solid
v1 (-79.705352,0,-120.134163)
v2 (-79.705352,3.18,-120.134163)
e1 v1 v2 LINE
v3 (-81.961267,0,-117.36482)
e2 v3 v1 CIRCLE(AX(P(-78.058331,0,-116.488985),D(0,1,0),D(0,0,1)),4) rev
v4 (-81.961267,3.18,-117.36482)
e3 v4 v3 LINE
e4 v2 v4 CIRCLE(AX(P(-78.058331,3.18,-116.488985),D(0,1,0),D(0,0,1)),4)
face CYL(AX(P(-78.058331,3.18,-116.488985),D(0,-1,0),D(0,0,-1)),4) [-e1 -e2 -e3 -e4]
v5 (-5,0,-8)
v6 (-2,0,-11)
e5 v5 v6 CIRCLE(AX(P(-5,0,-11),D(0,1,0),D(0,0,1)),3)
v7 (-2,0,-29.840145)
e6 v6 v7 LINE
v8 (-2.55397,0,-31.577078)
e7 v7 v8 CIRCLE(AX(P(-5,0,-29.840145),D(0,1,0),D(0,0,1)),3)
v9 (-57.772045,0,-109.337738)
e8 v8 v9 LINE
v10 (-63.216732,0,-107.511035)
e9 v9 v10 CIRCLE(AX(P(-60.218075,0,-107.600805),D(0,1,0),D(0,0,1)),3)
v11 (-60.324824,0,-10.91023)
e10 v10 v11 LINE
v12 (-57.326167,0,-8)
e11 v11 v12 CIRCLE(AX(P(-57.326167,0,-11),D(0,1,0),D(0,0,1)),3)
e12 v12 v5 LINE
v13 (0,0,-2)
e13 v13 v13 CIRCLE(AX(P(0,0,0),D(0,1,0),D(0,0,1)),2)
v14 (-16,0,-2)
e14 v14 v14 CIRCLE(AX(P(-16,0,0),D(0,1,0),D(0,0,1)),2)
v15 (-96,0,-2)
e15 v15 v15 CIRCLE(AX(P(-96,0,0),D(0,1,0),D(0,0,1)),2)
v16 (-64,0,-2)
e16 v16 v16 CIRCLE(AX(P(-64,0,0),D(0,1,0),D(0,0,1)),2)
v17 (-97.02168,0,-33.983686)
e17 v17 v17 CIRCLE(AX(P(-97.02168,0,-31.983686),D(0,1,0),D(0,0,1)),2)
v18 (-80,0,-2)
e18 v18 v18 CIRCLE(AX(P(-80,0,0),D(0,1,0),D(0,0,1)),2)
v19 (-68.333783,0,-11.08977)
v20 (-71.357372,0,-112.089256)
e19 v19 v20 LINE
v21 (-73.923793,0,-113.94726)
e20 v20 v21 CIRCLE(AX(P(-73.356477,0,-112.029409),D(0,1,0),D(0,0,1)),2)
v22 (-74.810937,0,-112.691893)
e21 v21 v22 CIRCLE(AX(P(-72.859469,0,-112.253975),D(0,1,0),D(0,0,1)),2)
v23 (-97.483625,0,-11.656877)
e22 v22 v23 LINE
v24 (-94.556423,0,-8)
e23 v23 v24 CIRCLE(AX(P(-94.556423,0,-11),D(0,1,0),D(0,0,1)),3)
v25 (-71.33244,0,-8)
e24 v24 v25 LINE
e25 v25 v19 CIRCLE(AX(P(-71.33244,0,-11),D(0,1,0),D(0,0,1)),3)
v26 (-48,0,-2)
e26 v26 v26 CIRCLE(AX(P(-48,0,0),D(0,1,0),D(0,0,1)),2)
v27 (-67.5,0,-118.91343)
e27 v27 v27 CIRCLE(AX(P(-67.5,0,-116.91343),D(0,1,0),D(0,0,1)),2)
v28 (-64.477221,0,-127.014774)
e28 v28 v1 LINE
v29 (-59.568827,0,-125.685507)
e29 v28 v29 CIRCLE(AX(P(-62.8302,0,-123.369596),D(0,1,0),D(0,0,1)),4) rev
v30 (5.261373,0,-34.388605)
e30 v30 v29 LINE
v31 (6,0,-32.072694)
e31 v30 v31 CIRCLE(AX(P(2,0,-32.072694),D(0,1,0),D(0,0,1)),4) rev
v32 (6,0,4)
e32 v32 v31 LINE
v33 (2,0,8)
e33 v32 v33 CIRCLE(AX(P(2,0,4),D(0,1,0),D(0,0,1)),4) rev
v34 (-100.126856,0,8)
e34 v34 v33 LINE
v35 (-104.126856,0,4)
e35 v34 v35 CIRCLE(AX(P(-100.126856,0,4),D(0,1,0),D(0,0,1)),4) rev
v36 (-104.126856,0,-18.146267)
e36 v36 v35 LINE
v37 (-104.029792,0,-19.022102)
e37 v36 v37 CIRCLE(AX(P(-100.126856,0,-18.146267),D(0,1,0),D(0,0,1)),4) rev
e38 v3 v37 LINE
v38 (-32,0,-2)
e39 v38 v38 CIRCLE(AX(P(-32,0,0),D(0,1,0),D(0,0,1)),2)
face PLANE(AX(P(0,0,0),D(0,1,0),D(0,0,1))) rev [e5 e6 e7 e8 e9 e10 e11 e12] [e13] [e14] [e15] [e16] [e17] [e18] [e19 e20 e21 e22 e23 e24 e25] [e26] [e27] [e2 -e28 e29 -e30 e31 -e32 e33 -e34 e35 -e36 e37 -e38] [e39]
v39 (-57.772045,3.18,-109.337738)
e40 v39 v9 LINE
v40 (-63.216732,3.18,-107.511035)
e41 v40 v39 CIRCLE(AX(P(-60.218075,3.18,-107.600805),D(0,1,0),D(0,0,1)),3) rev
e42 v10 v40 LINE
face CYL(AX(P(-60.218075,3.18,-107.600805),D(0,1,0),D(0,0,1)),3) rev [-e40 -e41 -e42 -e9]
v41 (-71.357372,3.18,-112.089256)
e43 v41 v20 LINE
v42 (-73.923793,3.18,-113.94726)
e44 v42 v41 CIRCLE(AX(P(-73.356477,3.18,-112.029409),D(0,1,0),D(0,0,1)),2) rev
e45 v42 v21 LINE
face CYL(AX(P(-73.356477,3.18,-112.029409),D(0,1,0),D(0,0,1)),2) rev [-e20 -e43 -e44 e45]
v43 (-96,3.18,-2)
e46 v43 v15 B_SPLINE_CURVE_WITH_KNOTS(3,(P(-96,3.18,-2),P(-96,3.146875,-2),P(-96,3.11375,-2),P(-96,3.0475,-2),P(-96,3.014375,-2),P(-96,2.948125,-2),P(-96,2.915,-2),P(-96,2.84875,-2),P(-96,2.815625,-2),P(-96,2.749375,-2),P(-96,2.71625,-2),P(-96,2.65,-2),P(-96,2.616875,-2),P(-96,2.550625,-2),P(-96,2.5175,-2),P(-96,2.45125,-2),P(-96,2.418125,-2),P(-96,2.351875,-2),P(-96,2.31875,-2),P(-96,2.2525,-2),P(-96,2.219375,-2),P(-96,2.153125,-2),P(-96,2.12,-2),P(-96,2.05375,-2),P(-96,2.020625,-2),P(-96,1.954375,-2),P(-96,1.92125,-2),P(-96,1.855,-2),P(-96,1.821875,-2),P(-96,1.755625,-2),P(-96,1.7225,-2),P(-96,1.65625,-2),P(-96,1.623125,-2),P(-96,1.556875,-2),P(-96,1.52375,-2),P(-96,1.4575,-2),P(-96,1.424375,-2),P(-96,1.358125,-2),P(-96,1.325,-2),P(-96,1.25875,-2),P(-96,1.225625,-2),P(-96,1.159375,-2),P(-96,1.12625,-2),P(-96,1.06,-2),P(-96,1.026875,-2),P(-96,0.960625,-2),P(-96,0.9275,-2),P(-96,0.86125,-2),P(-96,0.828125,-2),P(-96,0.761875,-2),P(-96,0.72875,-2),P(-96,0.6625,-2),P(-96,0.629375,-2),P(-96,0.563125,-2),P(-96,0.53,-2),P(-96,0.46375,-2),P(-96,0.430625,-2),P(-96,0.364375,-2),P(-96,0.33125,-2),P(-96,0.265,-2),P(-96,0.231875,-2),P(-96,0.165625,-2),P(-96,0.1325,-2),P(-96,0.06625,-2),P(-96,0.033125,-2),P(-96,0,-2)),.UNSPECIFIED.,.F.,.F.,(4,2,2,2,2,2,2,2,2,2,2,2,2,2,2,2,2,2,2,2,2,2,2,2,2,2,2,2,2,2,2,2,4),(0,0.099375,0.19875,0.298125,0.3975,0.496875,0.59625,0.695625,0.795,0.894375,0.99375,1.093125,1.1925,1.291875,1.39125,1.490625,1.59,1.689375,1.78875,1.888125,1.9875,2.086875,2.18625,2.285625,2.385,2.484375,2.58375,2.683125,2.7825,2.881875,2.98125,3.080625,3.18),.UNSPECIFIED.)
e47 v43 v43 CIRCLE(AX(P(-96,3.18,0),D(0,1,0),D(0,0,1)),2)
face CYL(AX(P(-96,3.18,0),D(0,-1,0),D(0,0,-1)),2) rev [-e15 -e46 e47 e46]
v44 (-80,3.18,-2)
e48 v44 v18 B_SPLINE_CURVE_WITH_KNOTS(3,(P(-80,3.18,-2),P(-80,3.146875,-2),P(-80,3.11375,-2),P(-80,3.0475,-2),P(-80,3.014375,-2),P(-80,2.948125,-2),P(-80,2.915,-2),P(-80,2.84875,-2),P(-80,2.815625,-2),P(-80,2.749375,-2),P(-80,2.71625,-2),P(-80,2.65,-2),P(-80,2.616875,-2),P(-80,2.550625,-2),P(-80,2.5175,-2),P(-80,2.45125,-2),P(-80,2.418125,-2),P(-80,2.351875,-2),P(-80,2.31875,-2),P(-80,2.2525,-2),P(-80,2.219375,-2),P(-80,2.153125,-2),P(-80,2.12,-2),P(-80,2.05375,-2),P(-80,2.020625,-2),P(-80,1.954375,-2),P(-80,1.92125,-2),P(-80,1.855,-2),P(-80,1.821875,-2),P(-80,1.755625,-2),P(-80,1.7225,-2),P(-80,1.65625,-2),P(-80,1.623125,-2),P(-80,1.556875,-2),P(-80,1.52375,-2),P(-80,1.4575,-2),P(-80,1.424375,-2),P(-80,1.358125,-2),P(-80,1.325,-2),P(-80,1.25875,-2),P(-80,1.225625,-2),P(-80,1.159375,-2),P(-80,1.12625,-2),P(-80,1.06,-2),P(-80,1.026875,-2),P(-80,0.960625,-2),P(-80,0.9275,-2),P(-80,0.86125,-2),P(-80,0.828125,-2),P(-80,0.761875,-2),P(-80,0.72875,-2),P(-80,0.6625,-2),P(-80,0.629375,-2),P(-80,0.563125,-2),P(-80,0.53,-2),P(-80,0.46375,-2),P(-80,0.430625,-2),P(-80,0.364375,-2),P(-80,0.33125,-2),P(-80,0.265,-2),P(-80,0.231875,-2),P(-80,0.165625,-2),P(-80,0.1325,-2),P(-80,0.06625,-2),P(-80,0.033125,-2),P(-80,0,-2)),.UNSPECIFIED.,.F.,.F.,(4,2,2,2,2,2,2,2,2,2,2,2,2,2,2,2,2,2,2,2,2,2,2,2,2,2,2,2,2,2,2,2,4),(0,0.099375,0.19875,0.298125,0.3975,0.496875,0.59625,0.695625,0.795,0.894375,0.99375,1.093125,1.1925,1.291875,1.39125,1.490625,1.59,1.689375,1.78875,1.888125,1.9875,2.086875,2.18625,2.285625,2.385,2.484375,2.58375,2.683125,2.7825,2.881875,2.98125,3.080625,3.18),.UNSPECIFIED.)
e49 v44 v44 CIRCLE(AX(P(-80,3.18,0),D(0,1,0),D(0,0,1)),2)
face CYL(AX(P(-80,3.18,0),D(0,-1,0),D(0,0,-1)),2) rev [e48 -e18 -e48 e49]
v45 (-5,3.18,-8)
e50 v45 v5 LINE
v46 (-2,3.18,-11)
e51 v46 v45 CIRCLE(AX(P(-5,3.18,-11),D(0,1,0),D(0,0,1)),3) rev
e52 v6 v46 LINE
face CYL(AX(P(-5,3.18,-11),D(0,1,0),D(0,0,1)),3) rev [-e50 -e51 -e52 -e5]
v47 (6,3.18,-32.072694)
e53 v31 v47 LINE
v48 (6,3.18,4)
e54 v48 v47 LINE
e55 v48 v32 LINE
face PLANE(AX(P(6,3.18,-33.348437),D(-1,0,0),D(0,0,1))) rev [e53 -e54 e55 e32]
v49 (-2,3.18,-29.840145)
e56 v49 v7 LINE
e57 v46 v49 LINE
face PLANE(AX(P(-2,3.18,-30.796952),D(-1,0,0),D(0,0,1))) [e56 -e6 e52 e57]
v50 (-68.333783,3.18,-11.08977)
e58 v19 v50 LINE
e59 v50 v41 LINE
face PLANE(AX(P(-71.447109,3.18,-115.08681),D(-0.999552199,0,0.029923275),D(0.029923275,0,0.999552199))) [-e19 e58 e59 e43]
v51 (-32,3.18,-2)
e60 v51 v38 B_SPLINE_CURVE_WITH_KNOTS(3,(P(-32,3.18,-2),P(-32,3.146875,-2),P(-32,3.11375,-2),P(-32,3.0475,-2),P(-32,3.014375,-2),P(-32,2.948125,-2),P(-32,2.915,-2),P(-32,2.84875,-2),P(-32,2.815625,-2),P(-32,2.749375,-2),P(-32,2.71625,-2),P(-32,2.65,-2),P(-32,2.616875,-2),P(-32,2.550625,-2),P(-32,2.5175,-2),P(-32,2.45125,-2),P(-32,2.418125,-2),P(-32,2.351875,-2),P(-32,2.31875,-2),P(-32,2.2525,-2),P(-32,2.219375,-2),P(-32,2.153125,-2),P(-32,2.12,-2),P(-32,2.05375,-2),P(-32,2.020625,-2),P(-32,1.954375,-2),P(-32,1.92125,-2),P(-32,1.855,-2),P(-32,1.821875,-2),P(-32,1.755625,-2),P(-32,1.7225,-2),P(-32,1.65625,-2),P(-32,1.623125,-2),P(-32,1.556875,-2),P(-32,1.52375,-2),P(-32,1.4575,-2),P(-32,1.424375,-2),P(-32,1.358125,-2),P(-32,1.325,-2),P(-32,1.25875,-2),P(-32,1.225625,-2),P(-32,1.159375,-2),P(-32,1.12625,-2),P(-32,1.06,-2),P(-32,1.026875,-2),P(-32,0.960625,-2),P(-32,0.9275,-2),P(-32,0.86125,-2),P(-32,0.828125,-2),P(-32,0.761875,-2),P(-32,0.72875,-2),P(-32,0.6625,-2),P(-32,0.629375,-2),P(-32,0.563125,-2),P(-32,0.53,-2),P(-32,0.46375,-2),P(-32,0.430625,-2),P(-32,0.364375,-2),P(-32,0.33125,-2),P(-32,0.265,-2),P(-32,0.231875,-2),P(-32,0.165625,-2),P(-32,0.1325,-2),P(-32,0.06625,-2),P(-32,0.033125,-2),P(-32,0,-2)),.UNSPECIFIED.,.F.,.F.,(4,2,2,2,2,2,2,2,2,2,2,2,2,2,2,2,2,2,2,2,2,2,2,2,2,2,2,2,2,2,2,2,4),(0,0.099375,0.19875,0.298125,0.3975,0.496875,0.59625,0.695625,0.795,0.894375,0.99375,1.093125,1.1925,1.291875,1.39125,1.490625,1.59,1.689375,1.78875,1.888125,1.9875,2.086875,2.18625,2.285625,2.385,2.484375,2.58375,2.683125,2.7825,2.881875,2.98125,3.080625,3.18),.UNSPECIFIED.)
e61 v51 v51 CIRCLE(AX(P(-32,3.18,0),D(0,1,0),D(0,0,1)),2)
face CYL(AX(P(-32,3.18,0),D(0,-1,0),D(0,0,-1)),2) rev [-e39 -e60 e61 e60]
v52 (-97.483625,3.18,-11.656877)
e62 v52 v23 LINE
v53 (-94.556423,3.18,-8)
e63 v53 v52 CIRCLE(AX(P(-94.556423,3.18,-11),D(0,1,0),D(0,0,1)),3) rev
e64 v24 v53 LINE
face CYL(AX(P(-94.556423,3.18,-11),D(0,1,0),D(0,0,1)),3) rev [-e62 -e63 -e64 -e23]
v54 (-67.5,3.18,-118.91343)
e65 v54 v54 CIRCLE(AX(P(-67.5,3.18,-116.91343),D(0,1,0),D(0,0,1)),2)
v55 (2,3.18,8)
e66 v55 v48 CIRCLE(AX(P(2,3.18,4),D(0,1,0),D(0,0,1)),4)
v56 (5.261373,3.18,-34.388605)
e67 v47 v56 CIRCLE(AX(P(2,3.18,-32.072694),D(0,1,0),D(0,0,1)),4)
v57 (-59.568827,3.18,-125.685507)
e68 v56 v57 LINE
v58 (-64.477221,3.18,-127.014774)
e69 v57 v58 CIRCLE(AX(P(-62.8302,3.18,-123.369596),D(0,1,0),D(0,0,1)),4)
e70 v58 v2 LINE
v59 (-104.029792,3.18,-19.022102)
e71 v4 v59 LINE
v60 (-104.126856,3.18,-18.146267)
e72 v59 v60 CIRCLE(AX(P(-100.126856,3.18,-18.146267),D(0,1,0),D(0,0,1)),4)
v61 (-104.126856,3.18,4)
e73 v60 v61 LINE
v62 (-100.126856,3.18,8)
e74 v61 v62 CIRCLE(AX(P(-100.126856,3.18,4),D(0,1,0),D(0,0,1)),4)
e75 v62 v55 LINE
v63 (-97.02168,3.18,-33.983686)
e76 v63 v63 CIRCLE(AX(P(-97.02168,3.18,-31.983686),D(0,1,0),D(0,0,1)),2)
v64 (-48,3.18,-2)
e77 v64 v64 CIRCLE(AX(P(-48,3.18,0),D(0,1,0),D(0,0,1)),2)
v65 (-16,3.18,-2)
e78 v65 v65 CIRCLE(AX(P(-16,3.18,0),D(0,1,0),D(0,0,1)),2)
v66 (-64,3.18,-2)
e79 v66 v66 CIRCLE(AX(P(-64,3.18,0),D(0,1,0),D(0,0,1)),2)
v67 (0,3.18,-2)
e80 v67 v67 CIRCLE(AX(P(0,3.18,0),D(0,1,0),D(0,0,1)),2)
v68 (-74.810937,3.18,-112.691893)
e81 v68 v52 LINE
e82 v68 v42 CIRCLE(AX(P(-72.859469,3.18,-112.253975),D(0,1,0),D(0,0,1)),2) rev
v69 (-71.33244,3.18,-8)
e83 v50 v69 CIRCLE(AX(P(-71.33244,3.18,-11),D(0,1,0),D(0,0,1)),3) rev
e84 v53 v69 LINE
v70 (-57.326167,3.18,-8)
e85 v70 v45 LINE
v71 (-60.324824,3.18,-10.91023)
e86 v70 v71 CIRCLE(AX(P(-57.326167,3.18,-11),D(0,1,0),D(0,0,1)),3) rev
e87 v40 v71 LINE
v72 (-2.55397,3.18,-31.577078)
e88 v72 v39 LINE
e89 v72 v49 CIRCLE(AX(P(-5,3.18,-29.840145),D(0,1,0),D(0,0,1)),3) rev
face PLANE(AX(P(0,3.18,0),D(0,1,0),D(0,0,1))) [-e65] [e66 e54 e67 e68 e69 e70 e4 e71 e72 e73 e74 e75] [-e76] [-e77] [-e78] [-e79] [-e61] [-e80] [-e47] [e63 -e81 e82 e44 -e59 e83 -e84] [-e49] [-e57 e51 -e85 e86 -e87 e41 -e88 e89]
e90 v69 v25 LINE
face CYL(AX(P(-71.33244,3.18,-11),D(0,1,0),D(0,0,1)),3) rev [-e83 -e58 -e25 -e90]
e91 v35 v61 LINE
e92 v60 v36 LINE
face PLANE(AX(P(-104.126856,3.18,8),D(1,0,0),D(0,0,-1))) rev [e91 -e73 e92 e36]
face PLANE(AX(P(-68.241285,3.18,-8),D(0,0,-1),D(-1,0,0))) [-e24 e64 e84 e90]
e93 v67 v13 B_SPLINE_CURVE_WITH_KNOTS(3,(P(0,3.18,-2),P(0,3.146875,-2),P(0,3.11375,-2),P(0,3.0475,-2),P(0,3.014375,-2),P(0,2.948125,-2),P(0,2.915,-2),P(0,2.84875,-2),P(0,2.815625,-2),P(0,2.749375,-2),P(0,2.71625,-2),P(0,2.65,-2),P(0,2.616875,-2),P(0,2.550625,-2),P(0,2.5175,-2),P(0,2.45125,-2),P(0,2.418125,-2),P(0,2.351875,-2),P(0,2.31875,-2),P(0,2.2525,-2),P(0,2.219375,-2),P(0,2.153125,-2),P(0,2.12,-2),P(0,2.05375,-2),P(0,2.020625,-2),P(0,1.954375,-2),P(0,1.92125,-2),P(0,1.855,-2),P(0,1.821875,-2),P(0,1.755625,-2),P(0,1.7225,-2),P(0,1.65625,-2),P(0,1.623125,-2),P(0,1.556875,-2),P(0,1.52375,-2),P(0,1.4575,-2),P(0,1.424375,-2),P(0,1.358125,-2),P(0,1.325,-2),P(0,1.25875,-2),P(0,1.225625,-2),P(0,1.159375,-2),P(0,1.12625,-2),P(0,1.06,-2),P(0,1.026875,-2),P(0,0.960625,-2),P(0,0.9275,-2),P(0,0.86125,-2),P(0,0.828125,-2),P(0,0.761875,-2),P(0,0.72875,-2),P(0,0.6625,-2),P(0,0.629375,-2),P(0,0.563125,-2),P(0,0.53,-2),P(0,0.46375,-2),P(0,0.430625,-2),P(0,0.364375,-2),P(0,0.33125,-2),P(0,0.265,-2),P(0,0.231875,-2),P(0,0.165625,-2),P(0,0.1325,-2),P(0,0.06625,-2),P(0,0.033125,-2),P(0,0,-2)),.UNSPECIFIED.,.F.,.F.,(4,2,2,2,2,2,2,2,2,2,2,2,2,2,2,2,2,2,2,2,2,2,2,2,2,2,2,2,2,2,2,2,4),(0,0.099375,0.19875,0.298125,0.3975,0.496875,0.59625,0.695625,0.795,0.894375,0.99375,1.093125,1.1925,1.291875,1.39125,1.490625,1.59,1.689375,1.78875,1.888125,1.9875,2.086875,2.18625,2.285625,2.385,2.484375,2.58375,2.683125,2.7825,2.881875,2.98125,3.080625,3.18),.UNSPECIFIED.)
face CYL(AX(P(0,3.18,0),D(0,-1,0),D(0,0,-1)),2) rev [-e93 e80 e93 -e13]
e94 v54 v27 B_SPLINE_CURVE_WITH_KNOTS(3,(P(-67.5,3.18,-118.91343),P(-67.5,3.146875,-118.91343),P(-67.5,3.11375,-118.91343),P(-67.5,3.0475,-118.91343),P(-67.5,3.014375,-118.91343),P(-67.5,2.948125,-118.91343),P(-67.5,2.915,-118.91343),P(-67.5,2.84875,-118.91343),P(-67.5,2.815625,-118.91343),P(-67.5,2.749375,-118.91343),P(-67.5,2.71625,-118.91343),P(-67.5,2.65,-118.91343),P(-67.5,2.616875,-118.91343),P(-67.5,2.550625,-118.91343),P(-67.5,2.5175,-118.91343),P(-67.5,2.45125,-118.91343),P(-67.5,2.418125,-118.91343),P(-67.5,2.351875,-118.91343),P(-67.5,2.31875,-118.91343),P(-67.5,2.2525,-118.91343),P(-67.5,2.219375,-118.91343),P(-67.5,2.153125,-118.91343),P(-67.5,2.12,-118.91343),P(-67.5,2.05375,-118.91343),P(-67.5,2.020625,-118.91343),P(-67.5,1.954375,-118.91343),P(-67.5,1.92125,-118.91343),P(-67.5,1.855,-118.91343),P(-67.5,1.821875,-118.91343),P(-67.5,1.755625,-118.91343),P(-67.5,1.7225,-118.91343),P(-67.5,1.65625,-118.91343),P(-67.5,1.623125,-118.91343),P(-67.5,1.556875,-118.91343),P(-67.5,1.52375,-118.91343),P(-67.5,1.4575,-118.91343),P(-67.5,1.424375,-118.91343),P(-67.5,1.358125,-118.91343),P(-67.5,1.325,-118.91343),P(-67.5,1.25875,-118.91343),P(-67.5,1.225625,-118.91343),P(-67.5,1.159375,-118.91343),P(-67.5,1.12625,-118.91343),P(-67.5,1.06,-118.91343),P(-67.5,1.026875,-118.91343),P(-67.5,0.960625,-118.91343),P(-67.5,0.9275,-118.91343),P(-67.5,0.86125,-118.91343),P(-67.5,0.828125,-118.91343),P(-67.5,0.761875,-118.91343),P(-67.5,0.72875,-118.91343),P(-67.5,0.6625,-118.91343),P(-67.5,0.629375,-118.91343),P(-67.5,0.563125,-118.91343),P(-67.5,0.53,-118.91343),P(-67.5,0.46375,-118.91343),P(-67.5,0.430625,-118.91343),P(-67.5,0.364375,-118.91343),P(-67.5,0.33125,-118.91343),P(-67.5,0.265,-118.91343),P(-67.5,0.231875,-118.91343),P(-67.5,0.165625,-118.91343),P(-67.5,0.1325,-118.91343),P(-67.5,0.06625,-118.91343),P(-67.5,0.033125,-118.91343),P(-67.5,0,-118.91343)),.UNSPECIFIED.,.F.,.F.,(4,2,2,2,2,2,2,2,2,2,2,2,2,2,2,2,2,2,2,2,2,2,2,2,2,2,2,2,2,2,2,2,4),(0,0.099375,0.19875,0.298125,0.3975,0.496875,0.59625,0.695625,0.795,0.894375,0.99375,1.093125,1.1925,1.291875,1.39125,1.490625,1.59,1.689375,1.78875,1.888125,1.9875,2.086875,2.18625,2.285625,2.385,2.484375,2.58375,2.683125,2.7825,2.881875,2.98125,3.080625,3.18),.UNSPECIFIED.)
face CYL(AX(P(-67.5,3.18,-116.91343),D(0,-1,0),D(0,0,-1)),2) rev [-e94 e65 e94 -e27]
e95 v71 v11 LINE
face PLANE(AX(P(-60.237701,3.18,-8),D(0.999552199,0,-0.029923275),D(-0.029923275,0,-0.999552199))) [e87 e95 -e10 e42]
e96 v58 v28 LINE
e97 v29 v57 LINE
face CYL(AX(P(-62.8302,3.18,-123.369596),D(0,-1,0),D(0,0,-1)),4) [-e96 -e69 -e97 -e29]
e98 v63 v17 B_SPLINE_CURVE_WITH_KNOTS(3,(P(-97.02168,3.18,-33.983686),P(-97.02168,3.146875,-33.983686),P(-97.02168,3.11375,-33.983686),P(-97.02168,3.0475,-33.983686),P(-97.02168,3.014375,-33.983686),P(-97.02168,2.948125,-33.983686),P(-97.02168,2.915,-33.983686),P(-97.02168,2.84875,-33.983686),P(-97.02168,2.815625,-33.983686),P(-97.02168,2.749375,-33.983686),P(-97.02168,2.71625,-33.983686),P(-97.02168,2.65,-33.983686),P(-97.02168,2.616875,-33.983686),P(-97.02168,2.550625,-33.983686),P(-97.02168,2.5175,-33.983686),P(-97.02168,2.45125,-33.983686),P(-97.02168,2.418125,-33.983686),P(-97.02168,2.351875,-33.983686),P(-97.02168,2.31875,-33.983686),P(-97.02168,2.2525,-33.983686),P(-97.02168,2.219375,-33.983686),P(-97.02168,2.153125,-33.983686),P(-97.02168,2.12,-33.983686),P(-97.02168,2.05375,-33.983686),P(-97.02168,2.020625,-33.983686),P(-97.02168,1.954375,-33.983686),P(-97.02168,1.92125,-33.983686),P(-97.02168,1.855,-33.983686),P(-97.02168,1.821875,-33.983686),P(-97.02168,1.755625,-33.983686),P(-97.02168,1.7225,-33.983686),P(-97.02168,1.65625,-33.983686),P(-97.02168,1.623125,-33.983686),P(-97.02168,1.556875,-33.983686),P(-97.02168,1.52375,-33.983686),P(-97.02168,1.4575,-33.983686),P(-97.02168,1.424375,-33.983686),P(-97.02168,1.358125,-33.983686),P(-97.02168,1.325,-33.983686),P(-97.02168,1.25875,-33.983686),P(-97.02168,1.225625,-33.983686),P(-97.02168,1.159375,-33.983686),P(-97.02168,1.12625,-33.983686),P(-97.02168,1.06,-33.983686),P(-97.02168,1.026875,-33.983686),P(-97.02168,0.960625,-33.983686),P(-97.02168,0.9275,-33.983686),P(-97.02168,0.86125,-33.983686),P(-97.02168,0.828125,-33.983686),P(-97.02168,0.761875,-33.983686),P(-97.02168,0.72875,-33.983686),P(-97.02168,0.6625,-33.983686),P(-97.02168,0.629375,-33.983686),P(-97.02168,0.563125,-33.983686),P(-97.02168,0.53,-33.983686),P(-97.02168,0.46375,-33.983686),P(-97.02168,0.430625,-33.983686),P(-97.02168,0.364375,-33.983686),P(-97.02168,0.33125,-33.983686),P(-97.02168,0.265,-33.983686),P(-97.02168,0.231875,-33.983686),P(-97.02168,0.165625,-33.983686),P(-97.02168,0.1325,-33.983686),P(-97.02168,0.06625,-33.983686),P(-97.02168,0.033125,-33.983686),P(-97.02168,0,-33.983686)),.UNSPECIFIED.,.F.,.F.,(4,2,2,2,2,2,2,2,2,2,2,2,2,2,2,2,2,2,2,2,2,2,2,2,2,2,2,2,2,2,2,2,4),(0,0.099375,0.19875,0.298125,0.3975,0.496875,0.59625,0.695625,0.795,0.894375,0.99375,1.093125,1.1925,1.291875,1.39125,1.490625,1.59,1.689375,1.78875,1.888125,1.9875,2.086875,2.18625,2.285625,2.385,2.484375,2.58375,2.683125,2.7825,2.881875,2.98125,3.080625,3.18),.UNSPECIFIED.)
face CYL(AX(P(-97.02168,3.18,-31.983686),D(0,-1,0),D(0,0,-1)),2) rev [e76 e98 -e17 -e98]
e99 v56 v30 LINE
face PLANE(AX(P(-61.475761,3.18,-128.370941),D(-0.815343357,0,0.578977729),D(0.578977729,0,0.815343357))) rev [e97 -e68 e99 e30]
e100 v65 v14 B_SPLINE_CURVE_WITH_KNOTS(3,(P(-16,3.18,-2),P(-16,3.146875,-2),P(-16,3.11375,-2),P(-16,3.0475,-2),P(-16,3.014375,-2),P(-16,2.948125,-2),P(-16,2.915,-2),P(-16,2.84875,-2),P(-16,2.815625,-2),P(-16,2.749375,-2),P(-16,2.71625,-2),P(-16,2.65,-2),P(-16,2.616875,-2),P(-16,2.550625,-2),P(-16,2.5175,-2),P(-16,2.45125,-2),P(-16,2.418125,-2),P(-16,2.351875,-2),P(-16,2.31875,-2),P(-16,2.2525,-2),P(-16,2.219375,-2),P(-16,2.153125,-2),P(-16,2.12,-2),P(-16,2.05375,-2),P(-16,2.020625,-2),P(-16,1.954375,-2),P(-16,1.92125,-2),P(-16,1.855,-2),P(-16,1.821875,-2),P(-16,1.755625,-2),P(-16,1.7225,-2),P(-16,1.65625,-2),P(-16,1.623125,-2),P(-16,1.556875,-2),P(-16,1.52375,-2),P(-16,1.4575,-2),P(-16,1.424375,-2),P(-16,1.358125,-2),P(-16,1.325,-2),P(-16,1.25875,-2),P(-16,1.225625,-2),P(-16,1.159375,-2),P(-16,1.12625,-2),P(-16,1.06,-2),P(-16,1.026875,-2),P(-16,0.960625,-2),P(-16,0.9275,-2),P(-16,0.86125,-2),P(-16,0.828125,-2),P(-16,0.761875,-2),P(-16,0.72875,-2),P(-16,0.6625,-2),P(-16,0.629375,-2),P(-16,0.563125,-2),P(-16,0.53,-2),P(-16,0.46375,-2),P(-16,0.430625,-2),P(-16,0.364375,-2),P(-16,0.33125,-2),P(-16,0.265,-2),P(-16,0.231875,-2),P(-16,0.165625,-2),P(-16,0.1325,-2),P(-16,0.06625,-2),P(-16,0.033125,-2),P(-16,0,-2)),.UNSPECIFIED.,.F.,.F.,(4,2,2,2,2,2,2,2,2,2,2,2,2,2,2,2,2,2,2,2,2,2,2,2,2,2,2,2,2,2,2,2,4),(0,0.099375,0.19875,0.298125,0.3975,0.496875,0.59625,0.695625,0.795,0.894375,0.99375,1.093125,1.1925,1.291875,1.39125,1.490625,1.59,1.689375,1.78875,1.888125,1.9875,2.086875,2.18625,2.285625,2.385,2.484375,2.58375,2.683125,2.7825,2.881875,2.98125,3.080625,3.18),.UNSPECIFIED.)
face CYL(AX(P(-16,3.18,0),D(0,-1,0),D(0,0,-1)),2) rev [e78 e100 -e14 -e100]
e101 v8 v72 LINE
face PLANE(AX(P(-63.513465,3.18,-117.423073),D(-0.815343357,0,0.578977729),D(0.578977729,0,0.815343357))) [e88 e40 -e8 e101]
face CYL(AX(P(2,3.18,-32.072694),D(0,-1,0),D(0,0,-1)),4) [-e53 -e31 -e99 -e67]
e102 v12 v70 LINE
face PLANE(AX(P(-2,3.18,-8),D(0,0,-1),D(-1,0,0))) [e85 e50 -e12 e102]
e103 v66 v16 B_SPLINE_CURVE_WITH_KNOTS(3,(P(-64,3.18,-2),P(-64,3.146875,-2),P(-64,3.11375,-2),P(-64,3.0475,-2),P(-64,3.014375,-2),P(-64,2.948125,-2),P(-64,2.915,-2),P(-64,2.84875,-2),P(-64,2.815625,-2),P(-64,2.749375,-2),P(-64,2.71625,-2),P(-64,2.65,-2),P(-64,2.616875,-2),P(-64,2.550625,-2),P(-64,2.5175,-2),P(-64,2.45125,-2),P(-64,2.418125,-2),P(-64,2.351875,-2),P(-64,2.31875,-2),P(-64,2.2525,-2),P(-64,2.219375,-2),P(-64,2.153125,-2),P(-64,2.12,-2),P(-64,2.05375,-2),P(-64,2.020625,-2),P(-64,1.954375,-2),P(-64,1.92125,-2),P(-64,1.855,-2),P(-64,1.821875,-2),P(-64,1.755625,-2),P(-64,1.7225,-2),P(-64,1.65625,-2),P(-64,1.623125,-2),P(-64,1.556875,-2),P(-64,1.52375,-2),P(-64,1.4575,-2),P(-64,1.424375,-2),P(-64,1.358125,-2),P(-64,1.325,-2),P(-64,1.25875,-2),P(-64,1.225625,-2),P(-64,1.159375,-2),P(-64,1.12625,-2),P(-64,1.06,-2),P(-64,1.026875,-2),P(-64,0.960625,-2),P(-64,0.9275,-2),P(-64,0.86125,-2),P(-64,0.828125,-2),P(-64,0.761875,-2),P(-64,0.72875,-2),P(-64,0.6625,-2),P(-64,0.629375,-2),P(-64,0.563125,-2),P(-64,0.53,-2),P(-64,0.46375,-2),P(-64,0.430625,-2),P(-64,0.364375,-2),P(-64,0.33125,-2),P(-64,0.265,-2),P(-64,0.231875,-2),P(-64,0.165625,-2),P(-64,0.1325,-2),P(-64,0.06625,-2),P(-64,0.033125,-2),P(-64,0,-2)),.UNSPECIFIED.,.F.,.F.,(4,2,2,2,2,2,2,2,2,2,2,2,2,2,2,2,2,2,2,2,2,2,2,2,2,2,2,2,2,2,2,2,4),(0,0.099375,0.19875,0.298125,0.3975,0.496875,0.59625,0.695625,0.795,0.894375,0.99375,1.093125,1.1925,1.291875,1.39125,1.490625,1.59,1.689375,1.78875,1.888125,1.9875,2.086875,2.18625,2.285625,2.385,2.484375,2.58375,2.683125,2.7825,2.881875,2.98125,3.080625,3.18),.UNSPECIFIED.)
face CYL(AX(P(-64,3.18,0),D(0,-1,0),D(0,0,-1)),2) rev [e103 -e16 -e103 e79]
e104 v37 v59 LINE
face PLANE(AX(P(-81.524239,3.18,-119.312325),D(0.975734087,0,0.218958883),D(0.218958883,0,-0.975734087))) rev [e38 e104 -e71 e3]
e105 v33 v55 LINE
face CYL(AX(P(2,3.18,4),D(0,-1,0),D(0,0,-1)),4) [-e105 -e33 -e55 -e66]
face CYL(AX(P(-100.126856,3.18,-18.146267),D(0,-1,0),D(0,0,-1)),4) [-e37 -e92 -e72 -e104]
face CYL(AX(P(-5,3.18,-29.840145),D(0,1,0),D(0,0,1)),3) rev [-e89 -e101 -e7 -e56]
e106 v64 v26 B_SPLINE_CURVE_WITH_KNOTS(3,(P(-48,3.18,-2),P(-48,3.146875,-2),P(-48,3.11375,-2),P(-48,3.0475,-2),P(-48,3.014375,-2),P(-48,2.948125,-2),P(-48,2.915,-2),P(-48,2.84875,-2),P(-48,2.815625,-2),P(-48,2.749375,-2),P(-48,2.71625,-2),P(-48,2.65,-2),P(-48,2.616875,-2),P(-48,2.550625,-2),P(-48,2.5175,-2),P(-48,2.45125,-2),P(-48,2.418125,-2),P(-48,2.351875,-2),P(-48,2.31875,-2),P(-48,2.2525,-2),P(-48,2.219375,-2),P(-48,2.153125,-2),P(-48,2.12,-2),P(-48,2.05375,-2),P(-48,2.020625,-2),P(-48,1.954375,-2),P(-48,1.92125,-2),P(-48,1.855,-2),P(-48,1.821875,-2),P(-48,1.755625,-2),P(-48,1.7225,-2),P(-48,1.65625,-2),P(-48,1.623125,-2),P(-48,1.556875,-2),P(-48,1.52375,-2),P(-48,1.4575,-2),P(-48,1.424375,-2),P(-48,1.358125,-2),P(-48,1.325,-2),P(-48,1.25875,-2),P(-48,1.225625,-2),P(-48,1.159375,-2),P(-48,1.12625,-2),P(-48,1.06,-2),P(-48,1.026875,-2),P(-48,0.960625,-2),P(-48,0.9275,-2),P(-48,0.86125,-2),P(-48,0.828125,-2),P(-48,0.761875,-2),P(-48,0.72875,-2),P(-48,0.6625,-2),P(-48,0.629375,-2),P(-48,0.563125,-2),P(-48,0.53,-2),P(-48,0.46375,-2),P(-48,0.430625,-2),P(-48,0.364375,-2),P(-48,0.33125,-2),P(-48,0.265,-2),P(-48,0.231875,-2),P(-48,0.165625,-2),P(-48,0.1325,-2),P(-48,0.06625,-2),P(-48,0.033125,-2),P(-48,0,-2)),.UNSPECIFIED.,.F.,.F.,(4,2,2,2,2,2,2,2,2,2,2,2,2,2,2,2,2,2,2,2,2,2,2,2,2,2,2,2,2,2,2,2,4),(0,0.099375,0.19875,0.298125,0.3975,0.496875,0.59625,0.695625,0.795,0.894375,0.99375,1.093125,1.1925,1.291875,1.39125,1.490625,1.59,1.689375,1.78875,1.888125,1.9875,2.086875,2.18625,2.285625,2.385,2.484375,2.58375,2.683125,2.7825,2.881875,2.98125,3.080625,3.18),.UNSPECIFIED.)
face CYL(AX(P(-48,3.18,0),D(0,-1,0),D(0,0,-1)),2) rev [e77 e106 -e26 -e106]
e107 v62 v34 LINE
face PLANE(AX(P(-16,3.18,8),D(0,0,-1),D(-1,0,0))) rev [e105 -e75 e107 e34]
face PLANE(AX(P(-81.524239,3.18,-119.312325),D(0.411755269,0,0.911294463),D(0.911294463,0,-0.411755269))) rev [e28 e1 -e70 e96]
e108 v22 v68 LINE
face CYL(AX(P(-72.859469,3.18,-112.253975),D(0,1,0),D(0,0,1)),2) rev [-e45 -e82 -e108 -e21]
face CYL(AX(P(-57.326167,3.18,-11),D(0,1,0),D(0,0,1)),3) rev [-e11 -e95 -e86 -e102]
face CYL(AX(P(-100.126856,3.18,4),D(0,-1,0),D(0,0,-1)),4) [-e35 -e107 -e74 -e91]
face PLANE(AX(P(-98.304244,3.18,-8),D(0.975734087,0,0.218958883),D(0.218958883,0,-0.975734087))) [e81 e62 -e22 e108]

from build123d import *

# Parameters (mm, degrees)
SKETCH1_R           = 2
BOSS_EXTRUDE1_DEPTH = 3.18
FILLET2_R           = 4
FILLET4_R           = 3
FILLET5_R           = 2


with BuildPart() as part:
    # Sketch1 → Boss-Extrude1 (new body)
    with BuildSketch(Plane(origin=(0, 0, 0), x_dir=(1, 0, 0), z_dir=(0, 1, 0))):
        Polygon((-16, -8), (6, -8), (6, 33.34843691), (-61.475760907, 128.370940703), (-81.524239093, 119.312324779), (-104.126855641, 18.58956294), (-104.126855641, -8), (-86.093666761, -8), align=None)
        with Locations(Location((-16, 0, 0), (0, 0, 90))):
            Circle(SKETCH1_R, mode=Mode.SUBTRACT)
        with Locations(Location((0, 0, 0), (0, 0, 90))):
            Circle(SKETCH1_R, mode=Mode.SUBTRACT)
        with Locations(Location((-67.5, 116.913429511, 0), (0, 0, 90))):
            Circle(SKETCH1_R, mode=Mode.SUBTRACT)
        with Locations(Location((-32, 0, 0), (0, 0, 90))):
            Circle(SKETCH1_R, mode=Mode.SUBTRACT)
        with Locations(Location((-48, 0, 0), (0, 0, 90))):
            Circle(SKETCH1_R, mode=Mode.SUBTRACT)
        with Locations(Location((-64, 0, 0), (0, 0, 90))):
            Circle(SKETCH1_R, mode=Mode.SUBTRACT)
        with Locations(Location((-80, 0, 0), (0, 0, 90))):
            Circle(SKETCH1_R, mode=Mode.SUBTRACT)
        with Locations(Location((-96, 0, 0), (0, 0, 90))):
            Circle(SKETCH1_R, mode=Mode.SUBTRACT)
        with Locations(Location((-97.021679837, 31.983686003, 0), (0, 0, 90))):
            Circle(SKETCH1_R, mode=Mode.SUBTRACT)
        Polygon((-63.513465031, 117.423073167), (-2, 30.796951643), (-2, 8), (-60.237701437, 8), align=None, mode=Mode.SUBTRACT)
        Polygon((-68.241285453, 8), (-98.304243511, 8), (-74.592422981, 113.66564481), (-71.44710907, 115.086809569), align=None, mode=Mode.SUBTRACT)
    extrude(amount=BOSS_EXTRUDE1_DEPTH)

    # Fillet2
    fillet2_edges = [part.edges().sort_by_distance(p)[0] for p in [
        (6, 1.59, 8),
        (-104.126855641, 1.59, 8),
        (-104.126855641, 1.59, -18.58956294),
        (-81.524239093, 1.59, -119.312324779),
        (-61.475760907, 1.59, -128.370940703),
        (6, 1.59, -33.34843691),
    ]]
    fillet(fillet2_edges, radius=FILLET2_R)

    # Fillet4
    fillet4_edges = [part.edges().sort_by_distance(p)[0] for p in [
        (-98.304243511, 1.59, -8),
        (-68.241285453, 1.59, -8),
        (-63.513465031, 1.59, -117.423073167),
        (-60.237701437, 1.59, -8),
        (-2, 1.59, -8),
        (-2, 1.59, -30.796951643),
    ]]
    fillet(fillet4_edges, radius=FILLET4_R)

    # Fillet5
    # the kernel refuses this fillet: 2 mm, written as the material it adds along each edge
    with BuildSketch(Plane(origin=(-71.44710907, 0, -115.086809569), x_dir=(0.02992327493551802, 0, 0.9995521985454954), z_dir=(0, 1, 0))) as fillet5_piece_1:
        with BuildLine():
            CenterArc((FILLET5_R * 1.49944843897, -FILLET5_R), FILLET5_R, 90, 112.600412538)
            Line((FILLET5_R * 0.576240988861, -FILLET5_R * 1.3843019699), (0, 0))
            Line((0, 0), (FILLET5_R * 1.49944843897, 0))
        make_face()
    extrude(amount=3.18)
    with BuildSketch(Plane(origin=(-74.592422981, 0, -113.66564481), x_dir=(-0.21895888286608584, 0, 0.9757340865287201), z_dir=(0, 1, 0))) as fillet5_piece_2:
        with BuildLine():
            CenterArc((FILLET5_R * 0.498984426224, FILLET5_R), FILLET5_R, 216.963036407, 53.036963593)
            Line((-FILLET5_R * 0.300039170379, FILLET5_R * 0.39870033089), (0, 0))
            Line((0, 0), (FILLET5_R * 0.498984426224, 0))
        make_face()
    extrude(amount=3.18)


solid = part.part
